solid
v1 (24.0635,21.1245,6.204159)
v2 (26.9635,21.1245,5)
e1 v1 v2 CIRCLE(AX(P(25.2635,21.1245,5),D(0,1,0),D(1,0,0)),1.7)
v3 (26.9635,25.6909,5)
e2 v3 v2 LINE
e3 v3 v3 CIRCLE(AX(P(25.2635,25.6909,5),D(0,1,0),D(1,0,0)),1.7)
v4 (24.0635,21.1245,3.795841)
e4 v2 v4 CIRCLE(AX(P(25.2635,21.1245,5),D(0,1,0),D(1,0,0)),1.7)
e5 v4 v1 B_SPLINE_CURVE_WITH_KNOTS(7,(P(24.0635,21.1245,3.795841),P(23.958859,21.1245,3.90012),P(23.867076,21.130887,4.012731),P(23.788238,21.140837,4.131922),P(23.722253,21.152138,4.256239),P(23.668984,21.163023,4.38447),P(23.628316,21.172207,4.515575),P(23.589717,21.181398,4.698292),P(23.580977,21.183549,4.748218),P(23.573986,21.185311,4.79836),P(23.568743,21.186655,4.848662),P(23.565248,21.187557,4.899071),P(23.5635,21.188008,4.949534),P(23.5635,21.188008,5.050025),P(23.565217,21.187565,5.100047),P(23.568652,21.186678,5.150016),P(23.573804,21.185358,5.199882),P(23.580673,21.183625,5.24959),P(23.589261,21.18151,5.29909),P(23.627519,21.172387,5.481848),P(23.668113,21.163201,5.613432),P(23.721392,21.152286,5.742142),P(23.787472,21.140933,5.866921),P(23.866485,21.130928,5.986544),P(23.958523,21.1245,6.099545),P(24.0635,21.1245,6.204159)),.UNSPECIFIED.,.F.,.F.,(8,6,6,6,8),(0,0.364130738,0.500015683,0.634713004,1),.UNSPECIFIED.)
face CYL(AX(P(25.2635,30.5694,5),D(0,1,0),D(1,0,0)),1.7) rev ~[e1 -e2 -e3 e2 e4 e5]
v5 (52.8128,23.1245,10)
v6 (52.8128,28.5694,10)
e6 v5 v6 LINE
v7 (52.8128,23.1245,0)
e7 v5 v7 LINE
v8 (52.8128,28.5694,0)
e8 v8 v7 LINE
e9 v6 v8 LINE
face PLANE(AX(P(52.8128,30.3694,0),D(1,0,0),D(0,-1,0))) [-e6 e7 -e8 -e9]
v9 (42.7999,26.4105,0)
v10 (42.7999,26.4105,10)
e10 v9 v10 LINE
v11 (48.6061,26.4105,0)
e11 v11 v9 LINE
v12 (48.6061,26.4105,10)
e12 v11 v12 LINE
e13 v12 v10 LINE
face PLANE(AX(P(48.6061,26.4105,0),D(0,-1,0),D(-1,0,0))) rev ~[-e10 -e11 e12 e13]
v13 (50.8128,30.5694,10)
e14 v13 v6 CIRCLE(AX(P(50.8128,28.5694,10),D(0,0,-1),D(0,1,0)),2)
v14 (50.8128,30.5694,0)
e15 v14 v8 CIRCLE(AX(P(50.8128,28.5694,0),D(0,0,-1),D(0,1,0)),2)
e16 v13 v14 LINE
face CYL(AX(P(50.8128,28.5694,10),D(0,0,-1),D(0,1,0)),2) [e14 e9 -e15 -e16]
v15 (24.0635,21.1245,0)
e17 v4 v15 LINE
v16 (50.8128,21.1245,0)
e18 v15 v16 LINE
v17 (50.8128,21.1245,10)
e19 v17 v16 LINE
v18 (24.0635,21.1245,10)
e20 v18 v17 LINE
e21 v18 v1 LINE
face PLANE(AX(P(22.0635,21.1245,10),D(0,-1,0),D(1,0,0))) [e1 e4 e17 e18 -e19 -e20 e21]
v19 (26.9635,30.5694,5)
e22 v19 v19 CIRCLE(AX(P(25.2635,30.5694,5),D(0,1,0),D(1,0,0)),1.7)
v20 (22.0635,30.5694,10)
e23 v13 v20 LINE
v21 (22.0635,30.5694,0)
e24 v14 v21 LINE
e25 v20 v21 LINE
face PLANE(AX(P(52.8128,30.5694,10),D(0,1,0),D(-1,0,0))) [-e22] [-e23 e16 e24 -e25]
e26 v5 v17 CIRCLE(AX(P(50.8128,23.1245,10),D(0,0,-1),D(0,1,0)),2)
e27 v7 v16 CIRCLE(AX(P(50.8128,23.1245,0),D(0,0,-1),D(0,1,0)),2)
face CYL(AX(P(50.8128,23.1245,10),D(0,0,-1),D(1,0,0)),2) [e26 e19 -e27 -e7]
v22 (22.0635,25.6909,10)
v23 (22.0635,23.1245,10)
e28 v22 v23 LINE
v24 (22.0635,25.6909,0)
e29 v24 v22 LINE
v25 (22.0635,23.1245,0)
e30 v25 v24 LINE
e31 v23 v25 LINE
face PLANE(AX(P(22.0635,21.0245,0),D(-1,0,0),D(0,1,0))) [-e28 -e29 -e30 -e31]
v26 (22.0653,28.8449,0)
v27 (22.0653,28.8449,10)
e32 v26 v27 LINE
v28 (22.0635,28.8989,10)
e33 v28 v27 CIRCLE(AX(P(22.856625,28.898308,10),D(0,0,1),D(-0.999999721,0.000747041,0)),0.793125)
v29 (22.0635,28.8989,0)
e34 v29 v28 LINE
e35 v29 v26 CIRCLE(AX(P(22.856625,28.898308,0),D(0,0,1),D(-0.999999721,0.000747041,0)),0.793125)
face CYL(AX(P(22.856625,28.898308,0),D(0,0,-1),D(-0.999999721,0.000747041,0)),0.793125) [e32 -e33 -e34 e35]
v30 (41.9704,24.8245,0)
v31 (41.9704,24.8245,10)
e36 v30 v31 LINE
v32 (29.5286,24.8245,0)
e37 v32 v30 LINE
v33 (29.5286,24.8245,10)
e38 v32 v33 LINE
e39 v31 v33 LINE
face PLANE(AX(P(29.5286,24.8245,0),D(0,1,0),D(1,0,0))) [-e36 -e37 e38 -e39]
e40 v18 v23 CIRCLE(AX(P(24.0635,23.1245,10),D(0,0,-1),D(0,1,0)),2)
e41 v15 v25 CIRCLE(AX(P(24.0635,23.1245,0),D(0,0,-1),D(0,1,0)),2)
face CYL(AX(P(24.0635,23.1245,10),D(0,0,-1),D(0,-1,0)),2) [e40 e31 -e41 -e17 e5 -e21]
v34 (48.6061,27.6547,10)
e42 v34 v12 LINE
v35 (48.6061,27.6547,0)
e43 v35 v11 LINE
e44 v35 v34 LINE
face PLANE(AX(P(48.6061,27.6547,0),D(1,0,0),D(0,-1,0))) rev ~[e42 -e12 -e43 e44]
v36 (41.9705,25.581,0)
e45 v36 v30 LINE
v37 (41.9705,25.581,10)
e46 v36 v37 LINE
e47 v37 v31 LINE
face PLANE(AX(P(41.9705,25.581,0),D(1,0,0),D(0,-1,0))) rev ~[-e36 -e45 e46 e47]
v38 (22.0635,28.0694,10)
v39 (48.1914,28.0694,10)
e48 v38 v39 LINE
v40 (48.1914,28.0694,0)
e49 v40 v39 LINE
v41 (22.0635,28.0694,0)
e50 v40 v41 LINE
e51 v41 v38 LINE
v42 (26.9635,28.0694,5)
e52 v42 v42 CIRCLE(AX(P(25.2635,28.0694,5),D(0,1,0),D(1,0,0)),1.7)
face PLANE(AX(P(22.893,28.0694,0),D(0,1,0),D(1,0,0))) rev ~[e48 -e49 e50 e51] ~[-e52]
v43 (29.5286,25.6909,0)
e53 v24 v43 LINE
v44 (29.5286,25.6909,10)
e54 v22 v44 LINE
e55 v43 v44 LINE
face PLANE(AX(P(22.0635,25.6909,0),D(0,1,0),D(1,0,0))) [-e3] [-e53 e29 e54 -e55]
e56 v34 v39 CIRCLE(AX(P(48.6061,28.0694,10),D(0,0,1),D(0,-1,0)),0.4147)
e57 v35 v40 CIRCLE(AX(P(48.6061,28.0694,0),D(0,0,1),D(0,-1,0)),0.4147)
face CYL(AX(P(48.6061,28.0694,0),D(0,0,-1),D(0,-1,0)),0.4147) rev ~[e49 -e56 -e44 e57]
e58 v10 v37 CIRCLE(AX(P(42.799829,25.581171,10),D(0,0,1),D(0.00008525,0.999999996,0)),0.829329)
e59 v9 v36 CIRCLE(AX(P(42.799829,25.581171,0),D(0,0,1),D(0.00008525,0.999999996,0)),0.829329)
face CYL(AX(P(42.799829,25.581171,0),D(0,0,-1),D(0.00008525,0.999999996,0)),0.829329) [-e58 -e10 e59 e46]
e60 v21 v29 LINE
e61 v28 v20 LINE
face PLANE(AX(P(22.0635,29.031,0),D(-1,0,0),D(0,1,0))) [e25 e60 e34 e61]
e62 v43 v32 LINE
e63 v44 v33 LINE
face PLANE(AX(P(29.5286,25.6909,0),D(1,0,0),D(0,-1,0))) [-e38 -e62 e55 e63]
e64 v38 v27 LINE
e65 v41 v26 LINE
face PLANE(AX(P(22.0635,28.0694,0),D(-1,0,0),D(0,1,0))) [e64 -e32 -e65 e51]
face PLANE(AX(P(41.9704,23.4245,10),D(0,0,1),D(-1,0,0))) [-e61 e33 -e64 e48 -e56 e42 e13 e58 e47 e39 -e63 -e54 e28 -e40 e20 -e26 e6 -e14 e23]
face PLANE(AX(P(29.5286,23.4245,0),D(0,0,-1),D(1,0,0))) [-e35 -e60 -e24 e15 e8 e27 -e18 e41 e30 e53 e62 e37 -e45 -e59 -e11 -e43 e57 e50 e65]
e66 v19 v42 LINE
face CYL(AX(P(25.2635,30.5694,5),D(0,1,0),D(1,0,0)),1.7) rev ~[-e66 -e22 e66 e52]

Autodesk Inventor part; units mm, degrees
ref_plane "YZ Plane" through (0, 0, 0) normal (1, 0, 0) x (0, 1, 0)
ref_plane "XZ Plane" through (0, 0, 0) normal (0, 1, 0) x (-1, 0, 0)
ref_plane "XY Plane" through (0, 0, 0) normal (0, 0, 1) x (1, 0, 0)
sketch "Sketch1" plane through (0, 0, 0) normal (0, 0, 1) x (1, 0, 0)
  line L0 (22.0635, 29.031) -> (22.0741, 29.031)
  line L1 (22.0635, 29.031) -> (22.0635, 28.8989)
  arc A0 (22.0635, 28.8989) -> (22.0653, 28.8449) centre (22.893, 28.8989) ccw
  line L2 (22.893, 28.0694) -> (48.1914, 28.0694)
  arc A1 (48.6061, 27.6547) -> (48.1914, 28.0694) centre (48.6061, 28.0694) ccw
  line L3 (48.6061, 27.6547) -> (48.6061, 26.4105)
  line L4 (48.6061, 26.4105) -> (42.7999, 26.4105)
  arc A2 (42.7999, 26.4105) -> (41.9705, 25.581) centre (42.7999, 25.581) ccw
  line L5 (41.9705, 25.581) -> (41.9705, 23.4245)
  line L6 (29.5286, 23.4245) -> (41.9705, 23.4245)
  line L7 (29.5286, 25.6909) -> (29.5286, 23.4245)
  line L8 (22.0635, 25.6909) -> (29.5286, 25.6909)
  line L9 (22.0635, 33.3622) -> (52.8128, 33.3622)
  line L10 (52.8128, 33.3622) -> (52.8128, 19.4198)
  line L11 (52.8128, 19.4198) -> (22.0635, 19.4198)
  line L12 (22.0635, 19.4198) -> (22.0635, 33.3622)
  line L13 (21.7606, 28.8449) -> (22.0653, 28.8449)
  line L14 (56.2668, 28.0694) -> (56.2411, 28.0694)
  line L15 (22.0635, 25.6909) -> (30.348, 25.6909)
  line L16 (42.7999, 26.4105) -> (48.6061, 26.4105)
  line L17 (22.0635, 34.9405) -> (22.0635, 17.9582)
  line L18 (17.0806, 21.0245) -> (52.8128, 21.0245)
  line L19 (48.1914, 28.0694) -> (22.0635, 28.0694)
  line L20 (14.2529, 30.3694) -> (52.8128, 30.3694)
  dimension "d0" = 2.4
  dimension "d2" = 2.3
extrude "Extrusion1" add sketch "Sketch1" along normal blind 10 contours L12 L20 L10 L18 L8 L7 L6 L5 A2 L4 L3 A1 L2 L19 A0 L1 | L12 L9 L10 L20 | L10 L11 L12 L18
sketch "Sketch2" plane through (0, 0, 10) normal (0, 0, 1) x (1, 0, 0)
  line L0 (22.0635, 28.0694) -> (48.1914, 28.0694) projected
  line L1 (41.9705, 23.4245) -> (29.5286, 23.4245) projected
  line L2 (22.0635, 25.6909) -> (22.0635, 19.4198) projected
  line L3 (52.8128, 19.4198) -> (52.8128, 33.3622) projected
  line L4 (22.0635, 33.3622) -> (52.8128, 33.3622)
  line L5 (52.8128, 33.3622) -> (52.8128, 30.5694)
  line L6 (52.8128, 30.5694) -> (22.0635, 30.5694)
  line L7 (22.0635, 30.5694) -> (22.0635, 33.3622)
  line L8 (52.8128, 19.4198) -> (22.0635, 19.4198)
  line L9 (22.0635, 19.4198) -> (22.0635, 21.1245)
  line L10 (22.0635, 21.1245) -> (52.8128, 21.1245)
  line L11 (52.8128, 21.1245) -> (52.8128, 19.4198)
  point P0 (0, 0)
  dimension "d5" = 2.5
  dimension "d6" = 2.3
extrude "Extrusion2" cut sketch "Sketch2" against normal blind 10
fillet "Fillet1" radius 2 3 edges at (52.8128, 30.5694, 5) (52.8128, 21.1245, 5) (22.0635, 21.1245, 5)
sketch "Sketch3" plane through (22.0635, 30.5694, 10) normal (0, 1, 0) x (1, 0, 0)
  line L0 (0, 0) -> (0, 10) projected
  circle A0 centre (3.2, 5) radius 1.7
  point P0 (-22.0635, 10)
  dimension "d10" = 3.4
  dimension "d11" = 3.2
extrude "Extrusion3" cut sketch "Sketch3" against normal blind 10
sketch "Sketch4" plane through (29.5286, 23.4245, 0) normal (0, 1, 0) x (1, 0, 0)
  line L0 (0, 0) -> (12.4418, 0) projected
  line L1 (0, 0) -> (0, -10) projected
  line L2 (12.4418, -10) -> (0, -10) projected
  line L3 (12.4418, 0) -> (12.4418, -10) projected
  point P0 (-29.5286, 0)
extrude "Extrusion4" add sketch "Sketch4" along normal blind 1.4
properties part number "Loop"
